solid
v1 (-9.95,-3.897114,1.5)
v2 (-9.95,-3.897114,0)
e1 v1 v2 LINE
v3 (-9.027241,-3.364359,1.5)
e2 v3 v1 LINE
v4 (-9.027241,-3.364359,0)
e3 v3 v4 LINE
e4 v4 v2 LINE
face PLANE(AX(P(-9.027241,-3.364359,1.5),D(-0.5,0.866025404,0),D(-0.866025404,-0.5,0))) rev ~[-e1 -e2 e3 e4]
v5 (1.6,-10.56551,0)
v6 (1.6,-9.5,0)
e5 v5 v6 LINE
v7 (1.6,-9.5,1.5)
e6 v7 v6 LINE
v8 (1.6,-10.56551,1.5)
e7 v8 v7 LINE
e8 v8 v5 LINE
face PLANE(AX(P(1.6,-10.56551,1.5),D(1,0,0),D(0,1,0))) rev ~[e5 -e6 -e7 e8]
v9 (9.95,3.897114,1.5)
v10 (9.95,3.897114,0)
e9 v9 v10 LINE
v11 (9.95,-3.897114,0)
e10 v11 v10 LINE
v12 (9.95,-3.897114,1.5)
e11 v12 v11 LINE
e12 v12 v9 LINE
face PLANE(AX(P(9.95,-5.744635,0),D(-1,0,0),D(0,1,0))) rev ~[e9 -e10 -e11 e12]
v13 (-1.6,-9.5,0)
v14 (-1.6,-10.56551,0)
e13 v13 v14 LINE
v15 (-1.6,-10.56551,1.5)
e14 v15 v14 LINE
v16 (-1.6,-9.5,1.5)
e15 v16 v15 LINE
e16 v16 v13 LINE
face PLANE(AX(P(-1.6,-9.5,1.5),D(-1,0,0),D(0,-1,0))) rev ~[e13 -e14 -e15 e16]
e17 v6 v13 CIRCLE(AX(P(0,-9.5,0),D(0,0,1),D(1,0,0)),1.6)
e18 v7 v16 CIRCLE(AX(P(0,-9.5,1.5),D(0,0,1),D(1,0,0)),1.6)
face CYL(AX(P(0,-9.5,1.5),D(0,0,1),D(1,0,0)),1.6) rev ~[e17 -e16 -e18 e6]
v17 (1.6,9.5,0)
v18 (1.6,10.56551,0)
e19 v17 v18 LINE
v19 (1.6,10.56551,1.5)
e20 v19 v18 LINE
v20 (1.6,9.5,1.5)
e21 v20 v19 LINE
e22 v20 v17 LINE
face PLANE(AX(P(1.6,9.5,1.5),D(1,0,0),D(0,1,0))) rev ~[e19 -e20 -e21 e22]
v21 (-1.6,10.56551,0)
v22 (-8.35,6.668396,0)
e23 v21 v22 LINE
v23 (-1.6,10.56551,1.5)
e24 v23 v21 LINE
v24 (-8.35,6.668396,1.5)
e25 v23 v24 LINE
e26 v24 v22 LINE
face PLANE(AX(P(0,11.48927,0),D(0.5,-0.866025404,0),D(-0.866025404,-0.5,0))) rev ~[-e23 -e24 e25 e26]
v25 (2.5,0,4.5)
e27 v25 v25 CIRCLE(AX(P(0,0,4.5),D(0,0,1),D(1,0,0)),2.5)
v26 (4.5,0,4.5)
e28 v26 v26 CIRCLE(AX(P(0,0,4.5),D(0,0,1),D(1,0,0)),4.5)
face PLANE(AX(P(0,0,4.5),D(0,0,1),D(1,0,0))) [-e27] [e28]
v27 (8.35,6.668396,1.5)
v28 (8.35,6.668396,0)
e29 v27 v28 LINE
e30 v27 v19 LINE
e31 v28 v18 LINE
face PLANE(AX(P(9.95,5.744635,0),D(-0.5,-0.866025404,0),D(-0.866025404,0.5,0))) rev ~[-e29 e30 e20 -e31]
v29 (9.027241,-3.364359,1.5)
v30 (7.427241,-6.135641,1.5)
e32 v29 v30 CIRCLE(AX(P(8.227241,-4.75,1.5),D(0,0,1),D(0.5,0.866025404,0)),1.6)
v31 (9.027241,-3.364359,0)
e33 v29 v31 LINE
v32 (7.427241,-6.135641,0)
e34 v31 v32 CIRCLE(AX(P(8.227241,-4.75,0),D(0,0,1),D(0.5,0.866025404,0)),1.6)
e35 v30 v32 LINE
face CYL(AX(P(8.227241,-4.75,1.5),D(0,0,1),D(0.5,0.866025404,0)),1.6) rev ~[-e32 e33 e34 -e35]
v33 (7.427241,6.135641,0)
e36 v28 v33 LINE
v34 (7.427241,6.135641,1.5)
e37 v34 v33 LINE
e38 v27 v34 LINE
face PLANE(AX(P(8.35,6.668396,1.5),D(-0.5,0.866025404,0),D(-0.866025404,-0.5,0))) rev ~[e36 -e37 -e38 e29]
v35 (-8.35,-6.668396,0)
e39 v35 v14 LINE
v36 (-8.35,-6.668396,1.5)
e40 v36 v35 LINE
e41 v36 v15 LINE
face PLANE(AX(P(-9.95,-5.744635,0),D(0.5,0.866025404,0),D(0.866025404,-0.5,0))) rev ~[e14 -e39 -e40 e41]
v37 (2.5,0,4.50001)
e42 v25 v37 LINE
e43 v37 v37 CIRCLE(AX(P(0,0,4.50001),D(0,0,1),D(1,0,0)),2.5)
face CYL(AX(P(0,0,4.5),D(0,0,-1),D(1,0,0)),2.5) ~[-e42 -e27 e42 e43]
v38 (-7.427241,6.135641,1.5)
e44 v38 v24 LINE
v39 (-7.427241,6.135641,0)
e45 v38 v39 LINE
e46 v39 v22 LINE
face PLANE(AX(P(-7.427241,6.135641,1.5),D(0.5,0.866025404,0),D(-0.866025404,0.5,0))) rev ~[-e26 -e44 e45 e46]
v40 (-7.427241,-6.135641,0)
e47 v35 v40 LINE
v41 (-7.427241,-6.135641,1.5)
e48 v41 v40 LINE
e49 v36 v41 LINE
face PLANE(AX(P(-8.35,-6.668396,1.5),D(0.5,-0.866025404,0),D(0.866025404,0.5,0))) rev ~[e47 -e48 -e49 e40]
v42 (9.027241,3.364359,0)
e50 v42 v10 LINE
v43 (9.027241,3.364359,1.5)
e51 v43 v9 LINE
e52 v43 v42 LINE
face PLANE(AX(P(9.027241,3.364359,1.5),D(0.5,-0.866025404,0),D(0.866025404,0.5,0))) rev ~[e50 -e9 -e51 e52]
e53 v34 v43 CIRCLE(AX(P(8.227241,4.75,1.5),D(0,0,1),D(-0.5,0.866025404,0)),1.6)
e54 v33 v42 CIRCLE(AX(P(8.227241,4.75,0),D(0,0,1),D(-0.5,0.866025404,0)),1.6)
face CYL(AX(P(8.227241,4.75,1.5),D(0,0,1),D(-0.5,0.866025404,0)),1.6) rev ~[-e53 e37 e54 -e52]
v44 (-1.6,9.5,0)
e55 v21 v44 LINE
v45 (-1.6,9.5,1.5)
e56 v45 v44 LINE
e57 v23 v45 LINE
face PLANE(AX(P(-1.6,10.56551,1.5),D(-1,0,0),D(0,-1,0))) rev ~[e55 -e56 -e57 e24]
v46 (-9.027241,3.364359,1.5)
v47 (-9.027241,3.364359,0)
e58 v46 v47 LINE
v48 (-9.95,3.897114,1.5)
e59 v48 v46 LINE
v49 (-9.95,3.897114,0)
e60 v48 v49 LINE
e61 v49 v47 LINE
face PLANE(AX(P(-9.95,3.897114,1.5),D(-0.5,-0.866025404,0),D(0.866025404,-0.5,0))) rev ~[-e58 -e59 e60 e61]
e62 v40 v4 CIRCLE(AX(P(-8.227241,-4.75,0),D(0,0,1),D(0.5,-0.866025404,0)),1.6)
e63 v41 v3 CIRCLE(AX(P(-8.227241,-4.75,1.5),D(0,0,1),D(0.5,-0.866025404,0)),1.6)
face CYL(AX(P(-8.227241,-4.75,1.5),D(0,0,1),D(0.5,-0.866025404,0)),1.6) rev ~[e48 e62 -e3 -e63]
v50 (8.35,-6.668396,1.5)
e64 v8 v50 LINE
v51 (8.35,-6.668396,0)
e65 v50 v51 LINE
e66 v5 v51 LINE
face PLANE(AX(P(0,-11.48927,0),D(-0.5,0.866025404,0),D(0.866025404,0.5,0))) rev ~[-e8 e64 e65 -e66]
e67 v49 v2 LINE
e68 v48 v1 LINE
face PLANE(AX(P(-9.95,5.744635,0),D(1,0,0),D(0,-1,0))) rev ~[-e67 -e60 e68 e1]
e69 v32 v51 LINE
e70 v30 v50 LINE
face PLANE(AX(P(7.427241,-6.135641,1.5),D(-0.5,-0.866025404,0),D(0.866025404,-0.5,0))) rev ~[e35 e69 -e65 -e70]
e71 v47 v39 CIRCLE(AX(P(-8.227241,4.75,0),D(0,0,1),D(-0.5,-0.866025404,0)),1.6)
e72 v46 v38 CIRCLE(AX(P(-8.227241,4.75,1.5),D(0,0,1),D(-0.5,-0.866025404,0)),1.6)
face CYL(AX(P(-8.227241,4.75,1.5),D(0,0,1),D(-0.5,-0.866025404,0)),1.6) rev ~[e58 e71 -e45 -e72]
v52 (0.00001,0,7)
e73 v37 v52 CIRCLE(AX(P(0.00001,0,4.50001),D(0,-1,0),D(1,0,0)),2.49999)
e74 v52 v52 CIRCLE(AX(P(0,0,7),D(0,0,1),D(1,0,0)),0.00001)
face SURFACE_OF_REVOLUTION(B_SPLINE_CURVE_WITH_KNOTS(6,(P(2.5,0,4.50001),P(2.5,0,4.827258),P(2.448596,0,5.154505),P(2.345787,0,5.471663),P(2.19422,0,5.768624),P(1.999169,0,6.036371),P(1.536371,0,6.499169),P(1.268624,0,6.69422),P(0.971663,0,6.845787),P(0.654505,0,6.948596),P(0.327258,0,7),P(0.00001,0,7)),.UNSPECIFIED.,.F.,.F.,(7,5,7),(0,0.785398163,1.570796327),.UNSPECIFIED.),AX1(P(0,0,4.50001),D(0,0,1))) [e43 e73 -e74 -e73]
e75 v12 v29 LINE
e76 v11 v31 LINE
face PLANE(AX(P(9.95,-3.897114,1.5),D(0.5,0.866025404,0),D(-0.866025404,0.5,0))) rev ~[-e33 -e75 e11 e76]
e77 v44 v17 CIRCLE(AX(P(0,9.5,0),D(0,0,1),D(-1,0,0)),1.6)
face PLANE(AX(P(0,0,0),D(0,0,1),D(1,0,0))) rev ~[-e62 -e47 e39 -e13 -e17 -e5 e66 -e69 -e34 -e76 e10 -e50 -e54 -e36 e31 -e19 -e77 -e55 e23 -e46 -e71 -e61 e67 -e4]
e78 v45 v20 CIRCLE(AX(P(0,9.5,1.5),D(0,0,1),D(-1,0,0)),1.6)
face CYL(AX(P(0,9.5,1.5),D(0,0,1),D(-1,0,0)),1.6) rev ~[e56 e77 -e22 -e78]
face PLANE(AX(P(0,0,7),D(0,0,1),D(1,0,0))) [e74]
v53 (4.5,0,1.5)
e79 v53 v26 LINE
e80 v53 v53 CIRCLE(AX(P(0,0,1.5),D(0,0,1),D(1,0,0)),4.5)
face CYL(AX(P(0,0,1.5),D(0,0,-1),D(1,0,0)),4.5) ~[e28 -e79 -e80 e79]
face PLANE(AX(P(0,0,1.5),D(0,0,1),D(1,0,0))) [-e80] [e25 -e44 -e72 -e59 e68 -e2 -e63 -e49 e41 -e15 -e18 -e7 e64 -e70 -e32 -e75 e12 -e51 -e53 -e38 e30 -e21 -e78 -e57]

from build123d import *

# Parameters (mm, degrees)
F1_DEPTH = 1.5
F3_DEPTH = 1.501
F4_R     = 4.5
F5_DEPTH = 3
F6_R     = 2.5
F7_DEPTH = 2.5
F8_R     = 2.49999


# Not quite as in the source:
# - a fillet or chamfer is up to 0.001 mm smaller than in the source, because OpenCascade refuses the exact size


with BuildPart() as f1:
    # F0 (on Top) → F1 (new body)
    with BuildSketch(Plane.XY):
        Polygon((9.95, -5.7446351784), (9.95, 5.7446351784), (0, 11.4892703569), (-9.95, 5.7446351784), (-9.95, -5.7446351784), (0, -11.4892703569), align=None)
    extrude(amount=F1_DEPTH)

    # F2 (on face) → F3 (cut, through all)
    with BuildSketch(Plane.XY.offset(1.5)):
        with BuildLine():
            Line((-1.6, 10.5655099262), (-1.6, 9.5))
            ThreePointArc((-1.6, 9.5), (0, 7.9), (1.6, 9.5))
            Line((1.6, 9.5), (1.6, 10.5655099262))
            Line((1.6, 10.5655099262), (0, 11.4892703569))
            Line((0, 11.4892703569), (-1.6, 10.5655099262))
        make_face()
        with BuildLine():
            Line((9.95, 5.7446351784), (8.35, 6.6683956091))
            Line((8.35, 6.6683956091), (7.427241336, 6.1356406461))
            ThreePointArc((7.427241336, 6.1356406461), (6.8416006899, 3.95), (9.027241336, 3.3643593539))
            Line((9.027241336, 3.3643593539), (9.95, 3.897114317))
            Line((9.95, 3.897114317), (9.95, 5.7446351784))
        make_face()
        with BuildLine():
            Line((9.95, -5.7446351784), (9.95, -3.897114317))
            Line((9.95, -3.897114317), (9.027241336, -3.3643593539))
            ThreePointArc((9.027241336, -3.3643593539), (6.8416006899, -3.95), (7.427241336, -6.1356406461))
            Line((7.427241336, -6.1356406461), (8.35, -6.6683956091))
            Line((8.35, -6.6683956091), (9.95, -5.7446351784))
        make_face()
        with BuildLine():
            Line((-9.027241336, -3.3643593539), (-9.95, -3.897114317))
            Line((-9.95, -3.897114317), (-9.95, -5.7446351784))
            Line((-9.95, -5.7446351784), (-8.35, -6.6683956091))
            Line((-8.35, -6.6683956091), (-7.427241336, -6.1356406461))
            ThreePointArc((-7.427241336, -6.1356406461), (-6.8416006899, -3.95), (-9.027241336, -3.3643593539))
        make_face()
        with BuildLine():
            Line((-7.427241336, 6.1356406461), (-8.35, 6.6683956091))
            Line((-8.35, 6.6683956091), (-9.95, 5.7446351784))
            Line((-9.95, 5.7446351784), (-9.95, 3.897114317))
            Line((-9.95, 3.897114317), (-9.027241336, 3.3643593539))
            ThreePointArc((-9.027241336, 3.3643593539), (-6.8416006899, 3.95), (-7.427241336, 6.1356406461))
        make_face()
        with BuildLine():
            Line((-1.6, -9.5), (-1.6, -10.5655099262))
            Line((-1.6, -10.5655099262), (0, -11.4892703569))
            Line((0, -11.4892703569), (1.6, -10.5655099262))
            Line((1.6, -10.5655099262), (1.6, -9.5))
            ThreePointArc((1.6, -9.5), (0, -7.9), (-1.6, -9.5))
        make_face()
    extrude(amount=-F3_DEPTH, mode=Mode.SUBTRACT)

    # F4 (on face) → F5 (join)
    with BuildSketch(Plane.XY.offset(1.5)):
        Circle(F4_R)
    extrude(amount=F5_DEPTH)

    # F6 (on face) → F7 (join)
    with BuildSketch(Plane.XY.offset(4.5)):
        Circle(F6_R)
    extrude(amount=F7_DEPTH)

    # F8 (radius 2.5 in the source; OpenCascade refuses exactly that, so slightly less here)
    f8_edges = [f1.edges().sort_by_distance(p)[0] for p in [
        (-2.5, 0, 7),
    ]]
    fillet(f8_edges, radius=F8_R)


solid = f1.part
